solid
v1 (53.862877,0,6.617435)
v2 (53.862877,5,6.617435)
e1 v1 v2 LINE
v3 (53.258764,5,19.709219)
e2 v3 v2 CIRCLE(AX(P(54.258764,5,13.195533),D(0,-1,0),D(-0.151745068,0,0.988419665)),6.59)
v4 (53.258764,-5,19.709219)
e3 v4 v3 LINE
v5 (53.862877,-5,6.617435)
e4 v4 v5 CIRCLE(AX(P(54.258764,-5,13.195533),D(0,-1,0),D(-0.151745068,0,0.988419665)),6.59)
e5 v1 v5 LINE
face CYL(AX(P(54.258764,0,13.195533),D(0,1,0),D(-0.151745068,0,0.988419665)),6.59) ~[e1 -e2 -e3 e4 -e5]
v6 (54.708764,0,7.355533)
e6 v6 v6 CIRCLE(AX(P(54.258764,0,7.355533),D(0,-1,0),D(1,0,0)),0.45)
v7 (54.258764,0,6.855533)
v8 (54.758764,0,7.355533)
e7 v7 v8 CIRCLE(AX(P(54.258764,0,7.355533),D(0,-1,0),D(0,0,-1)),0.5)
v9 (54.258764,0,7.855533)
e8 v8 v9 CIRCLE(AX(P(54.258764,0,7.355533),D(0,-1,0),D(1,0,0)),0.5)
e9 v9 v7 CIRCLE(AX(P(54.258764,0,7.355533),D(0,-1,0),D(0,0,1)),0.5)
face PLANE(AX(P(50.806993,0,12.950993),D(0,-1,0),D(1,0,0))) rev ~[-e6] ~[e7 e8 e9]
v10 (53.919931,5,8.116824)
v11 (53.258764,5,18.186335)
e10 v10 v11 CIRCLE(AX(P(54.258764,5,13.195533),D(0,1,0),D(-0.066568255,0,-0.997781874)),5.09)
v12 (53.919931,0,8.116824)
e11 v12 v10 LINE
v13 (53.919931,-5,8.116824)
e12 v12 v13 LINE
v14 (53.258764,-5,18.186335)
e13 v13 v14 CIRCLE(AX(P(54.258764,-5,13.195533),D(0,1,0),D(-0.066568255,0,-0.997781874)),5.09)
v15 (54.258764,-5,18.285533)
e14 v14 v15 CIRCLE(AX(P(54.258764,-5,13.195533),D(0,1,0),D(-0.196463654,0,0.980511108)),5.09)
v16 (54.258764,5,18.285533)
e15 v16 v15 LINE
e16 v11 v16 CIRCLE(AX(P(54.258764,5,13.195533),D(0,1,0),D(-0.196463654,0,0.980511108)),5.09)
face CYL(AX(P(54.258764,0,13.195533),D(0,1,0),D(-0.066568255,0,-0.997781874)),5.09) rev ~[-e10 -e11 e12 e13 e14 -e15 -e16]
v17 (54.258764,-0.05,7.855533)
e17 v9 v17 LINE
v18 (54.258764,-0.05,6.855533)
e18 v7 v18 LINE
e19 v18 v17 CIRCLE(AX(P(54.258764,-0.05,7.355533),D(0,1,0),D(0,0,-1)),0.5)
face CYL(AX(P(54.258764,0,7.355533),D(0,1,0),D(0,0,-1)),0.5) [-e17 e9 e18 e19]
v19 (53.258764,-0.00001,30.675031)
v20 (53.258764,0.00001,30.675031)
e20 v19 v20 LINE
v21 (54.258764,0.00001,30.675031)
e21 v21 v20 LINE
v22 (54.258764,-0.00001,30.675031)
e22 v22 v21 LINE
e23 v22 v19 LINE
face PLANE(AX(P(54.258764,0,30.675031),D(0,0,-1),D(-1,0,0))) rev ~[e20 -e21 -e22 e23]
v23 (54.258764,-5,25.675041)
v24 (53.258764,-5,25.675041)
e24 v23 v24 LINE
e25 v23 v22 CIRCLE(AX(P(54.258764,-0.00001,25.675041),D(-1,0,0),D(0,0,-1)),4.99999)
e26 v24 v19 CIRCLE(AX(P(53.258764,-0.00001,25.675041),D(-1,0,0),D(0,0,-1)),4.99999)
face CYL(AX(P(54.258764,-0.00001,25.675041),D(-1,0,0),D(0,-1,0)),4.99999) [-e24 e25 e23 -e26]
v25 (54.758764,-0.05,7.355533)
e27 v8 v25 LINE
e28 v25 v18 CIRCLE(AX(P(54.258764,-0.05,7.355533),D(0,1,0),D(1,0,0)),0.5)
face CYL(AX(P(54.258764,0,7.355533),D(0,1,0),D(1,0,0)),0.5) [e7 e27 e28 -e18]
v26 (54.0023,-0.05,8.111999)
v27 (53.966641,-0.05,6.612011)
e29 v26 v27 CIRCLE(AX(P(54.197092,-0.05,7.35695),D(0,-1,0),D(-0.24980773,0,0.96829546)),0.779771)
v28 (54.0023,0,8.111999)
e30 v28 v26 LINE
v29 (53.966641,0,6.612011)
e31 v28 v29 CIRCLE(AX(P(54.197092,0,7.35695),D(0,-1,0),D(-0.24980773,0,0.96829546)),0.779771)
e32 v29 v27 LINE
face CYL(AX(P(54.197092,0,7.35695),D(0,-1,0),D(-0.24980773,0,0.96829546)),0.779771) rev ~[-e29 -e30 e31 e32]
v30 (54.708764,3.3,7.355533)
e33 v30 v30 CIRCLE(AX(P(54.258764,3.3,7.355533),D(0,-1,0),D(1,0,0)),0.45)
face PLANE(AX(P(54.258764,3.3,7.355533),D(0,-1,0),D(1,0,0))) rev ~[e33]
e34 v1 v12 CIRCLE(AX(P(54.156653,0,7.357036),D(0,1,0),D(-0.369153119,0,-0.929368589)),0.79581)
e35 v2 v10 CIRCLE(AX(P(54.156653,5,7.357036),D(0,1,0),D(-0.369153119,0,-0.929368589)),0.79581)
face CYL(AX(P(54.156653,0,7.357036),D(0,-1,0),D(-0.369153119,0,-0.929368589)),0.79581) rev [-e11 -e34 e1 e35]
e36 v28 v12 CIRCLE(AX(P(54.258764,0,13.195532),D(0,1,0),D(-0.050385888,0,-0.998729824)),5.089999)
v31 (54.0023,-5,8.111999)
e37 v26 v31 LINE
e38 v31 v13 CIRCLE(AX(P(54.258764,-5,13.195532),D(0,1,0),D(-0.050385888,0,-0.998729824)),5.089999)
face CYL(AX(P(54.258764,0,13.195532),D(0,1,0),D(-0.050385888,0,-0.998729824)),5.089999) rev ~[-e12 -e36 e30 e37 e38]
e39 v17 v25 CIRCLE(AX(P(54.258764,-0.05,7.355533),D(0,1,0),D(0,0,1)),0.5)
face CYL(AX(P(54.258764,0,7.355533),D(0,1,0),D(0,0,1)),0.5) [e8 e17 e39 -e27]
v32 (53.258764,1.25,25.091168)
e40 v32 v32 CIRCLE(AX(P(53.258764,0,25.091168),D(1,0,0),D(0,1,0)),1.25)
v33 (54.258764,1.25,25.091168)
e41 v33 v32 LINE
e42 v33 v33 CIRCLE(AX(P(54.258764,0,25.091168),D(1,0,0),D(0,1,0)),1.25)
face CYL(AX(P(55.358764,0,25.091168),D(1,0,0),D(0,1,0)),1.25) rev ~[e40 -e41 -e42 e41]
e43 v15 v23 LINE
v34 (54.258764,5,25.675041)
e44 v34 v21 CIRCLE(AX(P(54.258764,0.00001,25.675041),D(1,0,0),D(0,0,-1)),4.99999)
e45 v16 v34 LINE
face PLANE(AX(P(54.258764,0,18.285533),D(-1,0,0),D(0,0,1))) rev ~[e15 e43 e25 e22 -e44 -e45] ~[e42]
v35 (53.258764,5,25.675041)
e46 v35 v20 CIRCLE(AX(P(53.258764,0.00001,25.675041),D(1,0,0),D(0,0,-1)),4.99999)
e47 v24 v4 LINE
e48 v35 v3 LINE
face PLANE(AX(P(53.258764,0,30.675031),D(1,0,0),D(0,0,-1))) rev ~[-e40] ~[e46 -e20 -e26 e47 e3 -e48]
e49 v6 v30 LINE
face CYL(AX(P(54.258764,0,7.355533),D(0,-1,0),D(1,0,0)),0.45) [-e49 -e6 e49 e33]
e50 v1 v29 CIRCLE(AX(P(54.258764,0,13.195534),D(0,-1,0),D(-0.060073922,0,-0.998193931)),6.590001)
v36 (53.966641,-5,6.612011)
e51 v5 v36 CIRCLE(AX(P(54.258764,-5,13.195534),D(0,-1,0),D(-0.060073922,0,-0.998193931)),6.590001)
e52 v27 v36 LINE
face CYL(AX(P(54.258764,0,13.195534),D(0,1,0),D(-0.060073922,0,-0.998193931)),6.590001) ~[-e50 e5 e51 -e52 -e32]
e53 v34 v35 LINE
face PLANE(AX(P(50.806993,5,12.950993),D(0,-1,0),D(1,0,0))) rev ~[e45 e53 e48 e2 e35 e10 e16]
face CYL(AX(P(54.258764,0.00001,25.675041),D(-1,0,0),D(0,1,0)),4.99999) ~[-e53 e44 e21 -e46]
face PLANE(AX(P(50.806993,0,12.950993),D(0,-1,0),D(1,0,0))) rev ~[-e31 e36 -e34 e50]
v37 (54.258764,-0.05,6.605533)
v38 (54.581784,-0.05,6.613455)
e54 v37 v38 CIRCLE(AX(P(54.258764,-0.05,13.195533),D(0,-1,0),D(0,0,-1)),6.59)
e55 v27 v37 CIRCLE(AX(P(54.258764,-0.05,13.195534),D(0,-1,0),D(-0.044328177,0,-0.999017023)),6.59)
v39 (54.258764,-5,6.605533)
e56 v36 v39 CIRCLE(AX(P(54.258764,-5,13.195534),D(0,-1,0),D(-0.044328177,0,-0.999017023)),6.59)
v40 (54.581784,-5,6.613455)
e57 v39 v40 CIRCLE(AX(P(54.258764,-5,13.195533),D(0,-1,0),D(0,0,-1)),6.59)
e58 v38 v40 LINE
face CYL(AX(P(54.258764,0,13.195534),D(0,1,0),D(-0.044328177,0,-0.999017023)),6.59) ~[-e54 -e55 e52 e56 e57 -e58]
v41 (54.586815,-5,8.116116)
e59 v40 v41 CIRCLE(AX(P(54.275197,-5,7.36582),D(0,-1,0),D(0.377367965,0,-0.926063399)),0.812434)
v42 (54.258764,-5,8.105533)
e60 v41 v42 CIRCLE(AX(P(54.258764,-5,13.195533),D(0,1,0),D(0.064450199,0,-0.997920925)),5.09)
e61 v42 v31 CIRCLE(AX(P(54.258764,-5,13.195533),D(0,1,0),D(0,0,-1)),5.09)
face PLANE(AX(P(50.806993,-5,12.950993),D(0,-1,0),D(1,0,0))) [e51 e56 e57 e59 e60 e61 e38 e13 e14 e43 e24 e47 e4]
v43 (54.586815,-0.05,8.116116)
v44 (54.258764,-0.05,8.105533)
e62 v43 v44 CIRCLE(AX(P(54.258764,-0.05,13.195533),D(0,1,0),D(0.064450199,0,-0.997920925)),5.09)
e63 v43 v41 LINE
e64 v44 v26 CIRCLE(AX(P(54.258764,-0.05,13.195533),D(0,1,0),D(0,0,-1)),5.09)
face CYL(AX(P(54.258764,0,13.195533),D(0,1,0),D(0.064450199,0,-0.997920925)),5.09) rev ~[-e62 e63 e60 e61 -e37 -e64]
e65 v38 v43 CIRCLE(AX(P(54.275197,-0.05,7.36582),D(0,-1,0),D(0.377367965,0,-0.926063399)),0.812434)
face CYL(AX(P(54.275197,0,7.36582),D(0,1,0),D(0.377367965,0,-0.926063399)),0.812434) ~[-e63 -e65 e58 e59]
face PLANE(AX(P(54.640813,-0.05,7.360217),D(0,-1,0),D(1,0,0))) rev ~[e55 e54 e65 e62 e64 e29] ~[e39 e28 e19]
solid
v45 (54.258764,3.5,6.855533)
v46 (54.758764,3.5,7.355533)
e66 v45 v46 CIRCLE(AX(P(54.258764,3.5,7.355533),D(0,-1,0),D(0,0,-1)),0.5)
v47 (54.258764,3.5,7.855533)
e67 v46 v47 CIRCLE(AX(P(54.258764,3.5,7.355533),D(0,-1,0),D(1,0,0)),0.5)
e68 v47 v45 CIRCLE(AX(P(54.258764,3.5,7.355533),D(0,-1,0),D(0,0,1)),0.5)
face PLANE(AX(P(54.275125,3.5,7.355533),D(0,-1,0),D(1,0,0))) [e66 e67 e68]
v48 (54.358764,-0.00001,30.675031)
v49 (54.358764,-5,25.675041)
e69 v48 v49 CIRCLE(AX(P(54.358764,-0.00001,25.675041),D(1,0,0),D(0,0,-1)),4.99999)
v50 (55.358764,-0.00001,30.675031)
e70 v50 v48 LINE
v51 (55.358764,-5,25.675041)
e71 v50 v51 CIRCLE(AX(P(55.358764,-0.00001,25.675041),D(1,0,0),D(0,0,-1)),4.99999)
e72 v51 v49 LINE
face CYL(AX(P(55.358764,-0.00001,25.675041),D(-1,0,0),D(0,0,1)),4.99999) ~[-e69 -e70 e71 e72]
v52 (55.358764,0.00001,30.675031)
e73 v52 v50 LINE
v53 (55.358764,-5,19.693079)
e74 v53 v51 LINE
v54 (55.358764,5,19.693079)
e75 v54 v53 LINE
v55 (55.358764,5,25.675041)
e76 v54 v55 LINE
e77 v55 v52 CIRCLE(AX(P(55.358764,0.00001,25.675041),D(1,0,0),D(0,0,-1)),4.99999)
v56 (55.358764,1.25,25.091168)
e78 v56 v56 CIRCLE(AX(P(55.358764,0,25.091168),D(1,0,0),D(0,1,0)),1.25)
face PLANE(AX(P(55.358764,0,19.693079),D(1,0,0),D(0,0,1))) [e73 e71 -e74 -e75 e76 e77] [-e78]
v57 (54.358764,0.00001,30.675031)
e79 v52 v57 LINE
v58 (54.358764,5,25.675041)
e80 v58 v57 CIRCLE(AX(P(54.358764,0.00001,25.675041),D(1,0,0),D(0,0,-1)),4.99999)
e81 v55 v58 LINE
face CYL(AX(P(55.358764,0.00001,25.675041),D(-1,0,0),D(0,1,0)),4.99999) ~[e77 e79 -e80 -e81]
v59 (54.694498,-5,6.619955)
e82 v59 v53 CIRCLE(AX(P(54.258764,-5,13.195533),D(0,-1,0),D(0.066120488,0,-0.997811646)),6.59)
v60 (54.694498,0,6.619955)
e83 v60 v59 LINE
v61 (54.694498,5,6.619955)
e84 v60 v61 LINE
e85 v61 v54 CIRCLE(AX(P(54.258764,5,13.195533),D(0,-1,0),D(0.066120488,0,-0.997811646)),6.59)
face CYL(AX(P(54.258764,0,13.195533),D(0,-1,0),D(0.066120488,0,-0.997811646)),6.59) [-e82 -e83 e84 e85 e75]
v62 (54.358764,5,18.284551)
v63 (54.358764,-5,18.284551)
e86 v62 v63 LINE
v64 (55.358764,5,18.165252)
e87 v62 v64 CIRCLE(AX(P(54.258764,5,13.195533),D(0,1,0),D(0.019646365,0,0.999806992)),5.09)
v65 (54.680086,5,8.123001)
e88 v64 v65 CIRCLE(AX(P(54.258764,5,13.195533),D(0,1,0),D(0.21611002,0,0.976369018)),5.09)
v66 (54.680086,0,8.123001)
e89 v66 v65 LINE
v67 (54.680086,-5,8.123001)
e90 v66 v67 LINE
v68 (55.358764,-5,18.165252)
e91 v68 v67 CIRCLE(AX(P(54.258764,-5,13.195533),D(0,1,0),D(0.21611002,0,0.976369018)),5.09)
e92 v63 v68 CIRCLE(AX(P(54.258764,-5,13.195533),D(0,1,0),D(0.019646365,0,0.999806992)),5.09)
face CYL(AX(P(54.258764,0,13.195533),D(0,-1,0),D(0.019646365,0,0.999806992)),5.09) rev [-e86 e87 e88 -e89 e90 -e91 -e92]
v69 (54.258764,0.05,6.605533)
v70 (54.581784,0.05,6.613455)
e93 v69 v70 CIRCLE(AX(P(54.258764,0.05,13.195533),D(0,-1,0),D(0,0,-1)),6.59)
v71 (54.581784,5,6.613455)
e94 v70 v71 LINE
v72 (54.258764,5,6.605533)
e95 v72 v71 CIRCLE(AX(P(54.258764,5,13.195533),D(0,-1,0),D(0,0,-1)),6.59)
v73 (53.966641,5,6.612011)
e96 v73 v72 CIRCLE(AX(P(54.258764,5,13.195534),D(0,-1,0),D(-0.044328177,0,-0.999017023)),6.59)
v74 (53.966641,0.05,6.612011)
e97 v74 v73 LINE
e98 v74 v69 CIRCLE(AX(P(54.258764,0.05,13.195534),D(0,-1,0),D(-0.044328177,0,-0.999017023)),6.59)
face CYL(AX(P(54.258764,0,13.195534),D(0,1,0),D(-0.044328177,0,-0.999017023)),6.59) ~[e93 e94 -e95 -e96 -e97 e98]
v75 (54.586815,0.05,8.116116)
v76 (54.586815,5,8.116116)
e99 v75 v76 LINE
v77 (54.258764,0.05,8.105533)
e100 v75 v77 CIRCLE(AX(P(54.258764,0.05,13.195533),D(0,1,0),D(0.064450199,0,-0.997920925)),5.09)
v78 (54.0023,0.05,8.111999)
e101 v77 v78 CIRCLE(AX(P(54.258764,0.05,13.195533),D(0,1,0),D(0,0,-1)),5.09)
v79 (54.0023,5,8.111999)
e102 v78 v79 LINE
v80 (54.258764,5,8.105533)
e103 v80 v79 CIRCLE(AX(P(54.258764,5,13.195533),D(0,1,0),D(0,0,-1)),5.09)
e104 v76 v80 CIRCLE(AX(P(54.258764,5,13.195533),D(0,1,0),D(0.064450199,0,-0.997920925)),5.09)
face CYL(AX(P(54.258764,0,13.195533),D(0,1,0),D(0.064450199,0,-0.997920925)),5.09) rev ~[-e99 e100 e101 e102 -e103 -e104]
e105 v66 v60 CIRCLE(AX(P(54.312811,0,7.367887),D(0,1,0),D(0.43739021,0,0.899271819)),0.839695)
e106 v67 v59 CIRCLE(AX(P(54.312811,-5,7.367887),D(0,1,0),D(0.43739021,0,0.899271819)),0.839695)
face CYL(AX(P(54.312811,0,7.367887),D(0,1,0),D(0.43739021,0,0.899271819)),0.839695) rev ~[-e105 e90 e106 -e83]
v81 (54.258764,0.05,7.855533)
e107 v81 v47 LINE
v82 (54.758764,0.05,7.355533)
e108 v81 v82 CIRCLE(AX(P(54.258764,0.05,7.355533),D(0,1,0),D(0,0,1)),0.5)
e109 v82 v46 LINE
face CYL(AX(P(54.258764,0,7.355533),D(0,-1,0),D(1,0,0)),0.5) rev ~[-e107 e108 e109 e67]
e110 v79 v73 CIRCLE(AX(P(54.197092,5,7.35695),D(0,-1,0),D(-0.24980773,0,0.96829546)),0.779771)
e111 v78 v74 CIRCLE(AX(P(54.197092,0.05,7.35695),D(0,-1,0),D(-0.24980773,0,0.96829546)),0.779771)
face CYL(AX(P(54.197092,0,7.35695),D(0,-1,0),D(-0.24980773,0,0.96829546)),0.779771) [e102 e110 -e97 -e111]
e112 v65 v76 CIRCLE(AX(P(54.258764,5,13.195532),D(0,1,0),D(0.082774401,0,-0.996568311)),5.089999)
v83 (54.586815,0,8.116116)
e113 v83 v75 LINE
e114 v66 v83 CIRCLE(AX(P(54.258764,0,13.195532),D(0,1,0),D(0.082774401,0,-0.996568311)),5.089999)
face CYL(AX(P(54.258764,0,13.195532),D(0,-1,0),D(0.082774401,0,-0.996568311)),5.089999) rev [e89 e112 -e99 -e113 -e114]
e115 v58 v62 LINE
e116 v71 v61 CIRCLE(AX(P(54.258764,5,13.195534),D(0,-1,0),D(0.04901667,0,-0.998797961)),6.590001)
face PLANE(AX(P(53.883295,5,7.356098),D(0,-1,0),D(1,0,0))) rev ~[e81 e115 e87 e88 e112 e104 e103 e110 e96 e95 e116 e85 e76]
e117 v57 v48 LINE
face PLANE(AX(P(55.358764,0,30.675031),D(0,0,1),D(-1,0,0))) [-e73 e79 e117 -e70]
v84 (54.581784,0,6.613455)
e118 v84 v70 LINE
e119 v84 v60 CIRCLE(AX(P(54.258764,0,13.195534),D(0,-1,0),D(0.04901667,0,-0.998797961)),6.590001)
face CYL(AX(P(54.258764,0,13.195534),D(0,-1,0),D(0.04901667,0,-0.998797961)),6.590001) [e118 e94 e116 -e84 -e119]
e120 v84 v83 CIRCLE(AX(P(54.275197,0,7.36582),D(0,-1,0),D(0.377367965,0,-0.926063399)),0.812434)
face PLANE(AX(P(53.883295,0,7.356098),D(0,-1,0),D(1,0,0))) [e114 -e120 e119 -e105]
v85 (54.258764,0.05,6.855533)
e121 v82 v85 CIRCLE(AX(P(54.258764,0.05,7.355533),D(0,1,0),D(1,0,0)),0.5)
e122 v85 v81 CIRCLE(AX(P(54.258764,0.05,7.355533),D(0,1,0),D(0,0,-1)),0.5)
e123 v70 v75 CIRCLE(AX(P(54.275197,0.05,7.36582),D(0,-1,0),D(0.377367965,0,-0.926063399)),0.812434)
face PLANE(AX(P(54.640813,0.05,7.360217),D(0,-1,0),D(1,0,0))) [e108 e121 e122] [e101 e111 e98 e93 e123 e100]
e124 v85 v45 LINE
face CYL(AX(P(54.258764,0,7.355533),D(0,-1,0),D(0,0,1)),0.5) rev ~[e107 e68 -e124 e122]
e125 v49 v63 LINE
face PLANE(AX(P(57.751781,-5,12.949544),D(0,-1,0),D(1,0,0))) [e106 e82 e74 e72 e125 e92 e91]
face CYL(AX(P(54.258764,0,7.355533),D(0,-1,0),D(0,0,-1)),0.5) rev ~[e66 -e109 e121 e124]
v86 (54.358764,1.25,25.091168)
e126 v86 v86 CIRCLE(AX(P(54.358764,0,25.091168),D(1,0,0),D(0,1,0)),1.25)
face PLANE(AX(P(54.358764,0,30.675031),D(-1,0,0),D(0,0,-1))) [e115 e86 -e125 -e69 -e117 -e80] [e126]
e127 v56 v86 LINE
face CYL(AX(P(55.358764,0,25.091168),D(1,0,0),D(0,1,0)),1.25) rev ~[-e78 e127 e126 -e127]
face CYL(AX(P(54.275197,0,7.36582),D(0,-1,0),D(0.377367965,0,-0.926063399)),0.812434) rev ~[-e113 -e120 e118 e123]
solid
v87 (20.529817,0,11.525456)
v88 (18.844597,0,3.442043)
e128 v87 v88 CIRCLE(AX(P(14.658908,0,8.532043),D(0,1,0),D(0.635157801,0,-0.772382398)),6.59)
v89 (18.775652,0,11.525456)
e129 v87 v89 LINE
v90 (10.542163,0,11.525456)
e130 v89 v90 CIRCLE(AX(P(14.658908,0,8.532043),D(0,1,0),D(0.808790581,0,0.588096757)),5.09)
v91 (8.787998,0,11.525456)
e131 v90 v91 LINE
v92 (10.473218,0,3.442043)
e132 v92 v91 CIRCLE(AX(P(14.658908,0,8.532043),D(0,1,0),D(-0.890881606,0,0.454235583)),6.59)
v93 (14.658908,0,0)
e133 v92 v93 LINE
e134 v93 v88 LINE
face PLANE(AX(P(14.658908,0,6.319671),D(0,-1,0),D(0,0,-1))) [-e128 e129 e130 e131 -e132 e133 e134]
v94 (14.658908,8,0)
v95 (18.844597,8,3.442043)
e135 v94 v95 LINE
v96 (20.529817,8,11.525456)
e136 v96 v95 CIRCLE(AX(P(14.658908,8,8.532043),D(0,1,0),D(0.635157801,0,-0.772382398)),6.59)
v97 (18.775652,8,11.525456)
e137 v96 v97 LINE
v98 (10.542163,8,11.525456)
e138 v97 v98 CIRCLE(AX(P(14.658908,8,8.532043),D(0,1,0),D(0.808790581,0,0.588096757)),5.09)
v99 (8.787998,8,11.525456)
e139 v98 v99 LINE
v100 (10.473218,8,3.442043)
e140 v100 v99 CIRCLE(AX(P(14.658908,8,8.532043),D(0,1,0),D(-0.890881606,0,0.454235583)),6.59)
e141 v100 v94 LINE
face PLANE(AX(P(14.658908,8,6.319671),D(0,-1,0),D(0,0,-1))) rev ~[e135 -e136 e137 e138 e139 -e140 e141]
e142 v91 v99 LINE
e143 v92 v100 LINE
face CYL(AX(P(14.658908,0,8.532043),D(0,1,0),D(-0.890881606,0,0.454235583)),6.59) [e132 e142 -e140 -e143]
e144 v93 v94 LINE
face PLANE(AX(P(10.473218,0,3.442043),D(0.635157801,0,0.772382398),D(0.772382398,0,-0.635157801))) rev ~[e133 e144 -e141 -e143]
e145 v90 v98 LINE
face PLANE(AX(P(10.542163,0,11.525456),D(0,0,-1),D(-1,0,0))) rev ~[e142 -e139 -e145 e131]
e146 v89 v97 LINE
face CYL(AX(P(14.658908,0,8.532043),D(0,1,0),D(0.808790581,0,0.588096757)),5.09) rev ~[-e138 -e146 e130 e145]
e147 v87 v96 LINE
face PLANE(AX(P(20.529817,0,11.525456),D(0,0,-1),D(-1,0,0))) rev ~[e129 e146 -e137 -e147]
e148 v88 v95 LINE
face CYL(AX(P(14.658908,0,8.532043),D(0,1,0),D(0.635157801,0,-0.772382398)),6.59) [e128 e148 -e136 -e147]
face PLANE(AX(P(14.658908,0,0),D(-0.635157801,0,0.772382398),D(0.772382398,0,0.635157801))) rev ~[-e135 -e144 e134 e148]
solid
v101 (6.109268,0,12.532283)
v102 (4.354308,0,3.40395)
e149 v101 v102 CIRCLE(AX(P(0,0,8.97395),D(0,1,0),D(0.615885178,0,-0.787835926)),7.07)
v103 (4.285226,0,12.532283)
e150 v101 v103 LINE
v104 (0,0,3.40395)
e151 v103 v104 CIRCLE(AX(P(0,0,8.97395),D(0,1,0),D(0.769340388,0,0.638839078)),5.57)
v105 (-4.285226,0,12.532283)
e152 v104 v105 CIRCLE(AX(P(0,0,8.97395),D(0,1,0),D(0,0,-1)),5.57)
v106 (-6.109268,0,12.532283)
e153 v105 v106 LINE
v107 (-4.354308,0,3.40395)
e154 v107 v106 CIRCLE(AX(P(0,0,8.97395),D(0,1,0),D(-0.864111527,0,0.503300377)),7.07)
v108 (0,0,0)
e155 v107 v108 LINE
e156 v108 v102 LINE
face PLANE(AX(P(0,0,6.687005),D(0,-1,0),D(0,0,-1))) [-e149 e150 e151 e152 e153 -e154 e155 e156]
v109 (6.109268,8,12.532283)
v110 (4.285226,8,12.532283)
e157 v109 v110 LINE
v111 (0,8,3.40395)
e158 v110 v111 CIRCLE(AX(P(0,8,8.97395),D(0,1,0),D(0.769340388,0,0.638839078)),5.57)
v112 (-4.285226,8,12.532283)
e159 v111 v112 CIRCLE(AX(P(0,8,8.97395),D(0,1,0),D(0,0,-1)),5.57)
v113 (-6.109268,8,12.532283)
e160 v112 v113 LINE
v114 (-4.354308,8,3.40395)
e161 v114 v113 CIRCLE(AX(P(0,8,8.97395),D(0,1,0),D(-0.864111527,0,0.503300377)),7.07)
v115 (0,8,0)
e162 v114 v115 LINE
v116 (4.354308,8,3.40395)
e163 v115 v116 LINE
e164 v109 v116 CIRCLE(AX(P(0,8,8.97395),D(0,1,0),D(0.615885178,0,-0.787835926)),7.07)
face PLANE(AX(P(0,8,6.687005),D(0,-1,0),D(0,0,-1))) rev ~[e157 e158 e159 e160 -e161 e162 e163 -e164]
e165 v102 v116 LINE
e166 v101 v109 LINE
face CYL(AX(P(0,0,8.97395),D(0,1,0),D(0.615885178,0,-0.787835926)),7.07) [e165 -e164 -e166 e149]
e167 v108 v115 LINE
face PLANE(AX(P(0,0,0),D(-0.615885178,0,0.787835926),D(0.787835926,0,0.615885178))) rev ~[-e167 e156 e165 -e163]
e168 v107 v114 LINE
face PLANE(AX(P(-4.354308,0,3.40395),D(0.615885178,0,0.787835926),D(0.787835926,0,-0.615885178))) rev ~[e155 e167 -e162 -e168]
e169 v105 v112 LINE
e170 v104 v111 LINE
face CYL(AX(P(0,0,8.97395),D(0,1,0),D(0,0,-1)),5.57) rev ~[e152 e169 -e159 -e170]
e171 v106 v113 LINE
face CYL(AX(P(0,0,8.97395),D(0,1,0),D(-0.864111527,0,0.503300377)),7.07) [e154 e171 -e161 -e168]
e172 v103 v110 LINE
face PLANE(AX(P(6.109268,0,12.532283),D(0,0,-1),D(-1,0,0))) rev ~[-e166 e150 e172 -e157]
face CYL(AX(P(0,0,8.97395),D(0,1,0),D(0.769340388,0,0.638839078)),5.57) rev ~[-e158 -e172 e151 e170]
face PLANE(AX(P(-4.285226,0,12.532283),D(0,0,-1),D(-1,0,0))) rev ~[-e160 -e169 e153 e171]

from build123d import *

# Parameters (mm, degrees)
F5_DEPTH  = 5
F0_R      = 0.45
F6_DEPTH  = 3.5
F7_DEPTH  = 5
F8_DEPTH  = 3.3
F9_DEPTH  = 5.001
F10_DEPTH = 8.001
F11_DEPTH = 0.05
F12_R     = 1.25
F13_DEPTH = 62.4297639076
F14_R     = 4.99999


# Not quite as in the source:
# - a fillet or chamfer is up to 0.001 mm smaller than in the source, because OpenCascade refuses the exact size
# - a feature names something its author has since deleted; it is built from what else it names


with BuildPart() as f3:
    # F3: sweep along a path in F2
    with BuildLine(Plane.XY) as f3_path:
        Line((0, 0), (0, 8))
    # F0 (on Front) → F3 (sweep)
    with BuildSketch(Plane.XZ):
        with BuildLine():
            Line((-4.2852259595, 12.5322833964), (-6.1092684933, 12.5322833964))
            ThreePointArc((-6.1092684933, 12.5322833964), (-6.9428544736, 7.6391569536), (-4.3543082114, 3.4039497307))
            Line((-4.3543082114, 3.4039497307), (0, 3.4039497307))
            ThreePointArc((0, 3.4039497307), (-5.042063988, 6.6069916109), (-4.2852259595, 12.5322833964))
        make_face()
        with BuildLine():
            Line((0, 3.4039497307), (-4.3543082114, 3.4039497307))
            ThreePointArc((-4.3543082114, 3.4039497307), (-2.3027157879, 2.2894602214), (0, 1.9039497307))
            Line((0, 1.9039497307), (0, 3.4039497307))
        make_face()
        with BuildLine():
            ThreePointArc((0, 1.9039497307), (-2.3027157879, 2.2894602214), (-4.3543082114, 3.4039497307))
            Line((-4.3543082114, 3.4039497307), (0, 0))
            Line((0, 0), (0, 1.9039497307))
        make_face()
        with BuildLine():
            ThreePointArc((4.3543082114, 3.4039497307), (2.3027157879, 2.2894602214), (0, 1.9039497307))
            Line((0, 1.9039497307), (0, 0))
            Line((0, 0), (4.3543082114, 3.4039497307))
        make_face()
        with BuildLine():
            Line((0, 3.4039497307), (0, 1.9039497307))
            ThreePointArc((0, 1.9039497307), (2.3027157879, 2.2894602214), (4.3543082114, 3.4039497307))
            Line((4.3543082114, 3.4039497307), (0, 3.4039497307))
        make_face()
        with BuildLine():
            ThreePointArc((4.2852259595, 12.5322833964), (5.042063988, 6.6069916109), (0, 3.4039497307))
            Line((0, 3.4039497307), (4.3543082114, 3.4039497307))
            ThreePointArc((4.3543082114, 3.4039497307), (6.9428544736, 7.6391569536), (6.1092684933, 12.5322833964))
            Line((6.1092684933, 12.5322833964), (4.2852259595, 12.5322833964))
        make_face()
    sweep(path=f3_path.line)

    # F0 (on Front) → F9 (cut, through all)
    with BuildSketch(Plane.XZ):
        with BuildLine():
            ThreePointArc((54.5868154242, 8.1161158316), (55.0876267464, 7.3630999101), (54.581783754, 6.6134547771))
            ThreePointArc((54.581783754, 6.6134547771), (54.6381547588, 6.6164632985), (54.6944979239, 6.6199545901))
            ThreePointArc((54.6944979239, 6.6199545901), (55.1524674782, 7.3759380646), (54.6800855939, 8.1230006335))
            ThreePointArc((54.6800855939, 8.1230006335), (54.6334663221, 8.1193440091), (54.5868154242, 8.1161158316))
        make_face()
    extrude(amount=F9_DEPTH, mode=Mode.SUBTRACT)

    # F0 (on Front) → F10 (cut, through all)
    with BuildSketch(Plane.XZ):
        with BuildLine():
            ThreePointArc((53.9199314878, 8.116823601), (53.3614179699, 7.3872965022), (53.862876759, 6.6174353327))
            ThreePointArc((53.862876759, 6.6174353327), (53.9147482987, 6.6145187306), (53.9666412198, 6.6120111547))
            ThreePointArc((53.9666412198, 6.6120111547), (53.4175421646, 7.3754821716), (54.0022997363, 8.1119985313))
            ThreePointArc((54.0022997363, 8.1119985313), (53.961105835, 8.1142441636), (53.9199314878, 8.116823601))
        make_face()
    extrude(amount=-F10_DEPTH, mode=Mode.SUBTRACT)


with BuildPart() as f4:
    # F4: sweep along a path in F2
    with BuildLine(Plane.XY) as f4_path:
        Line((14.6589075401, 0), (14.6589075401, 8))
    # F0 (on Front) → F4 (sweep)
    with BuildSketch(Plane.XZ):
        with BuildLine():
            Line((10.542163481, 11.5254557146), (8.7879977598, 11.5254557146))
            ThreePointArc((8.7879977598, 11.5254557146), (8.2076139721, 7.1870854906), (10.4732176329, 3.442043222))
            Line((10.4732176329, 3.442043222), (14.6589075401, 3.442043222))
            ThreePointArc((14.6589075401, 3.442043222), (10.1232394754, 6.2221048665), (10.542163481, 11.5254557146))
        make_face()
        with BuildLine():
            Line((14.6589075401, 3.442043222), (10.4732176329, 3.442043222))
            ThreePointArc((10.4732176329, 3.442043222), (12.4357341326, 2.3283668926), (14.6589075401, 1.942043222))
            Line((14.6589075401, 1.942043222), (14.6589075401, 3.442043222))
        make_face()
        with BuildLine():
            ThreePointArc((14.6589075401, 1.942043222), (12.4357341326, 2.3283668926), (10.4732176329, 3.442043222))
            Line((10.4732176329, 3.442043222), (14.6589075401, 0))
            Line((14.6589075401, 0), (14.6589075401, 1.942043222))
        make_face()
        with BuildLine():
            ThreePointArc((18.8445974474, 3.442043222), (16.8820809477, 2.3283668926), (14.6589075401, 1.942043222))
            Line((14.6589075401, 1.942043222), (14.6589075401, 0))
            Line((14.6589075401, 0), (18.8445974474, 3.442043222))
        make_face()
        with BuildLine():
            Line((14.6589075401, 3.442043222), (14.6589075401, 1.942043222))
            ThreePointArc((14.6589075401, 1.942043222), (16.8820809477, 2.3283668926), (18.8445974474, 3.442043222))
            Line((18.8445974474, 3.442043222), (14.6589075401, 3.442043222))
        make_face()
        with BuildLine():
            ThreePointArc((18.7756515993, 11.5254557146), (19.1945756049, 6.2221048665), (14.6589075401, 3.442043222))
            Line((14.6589075401, 3.442043222), (18.8445974474, 3.442043222))
            ThreePointArc((18.8445974474, 3.442043222), (21.1102011082, 7.1870854906), (20.5298173205, 11.5254557146))
            Line((20.5298173205, 11.5254557146), (18.7756515993, 11.5254557146))
        make_face()
    sweep(path=f4_path.line)


with BuildPart() as f5:
    # F0 (on Front) → F5 (new body)
    with BuildSketch(Plane.XZ):
        with BuildLine():
            Line((53.2587639076, 18.1863348766), (53.2587639076, 19.7092189305))
            ThreePointArc((53.2587639076, 19.7092189305), (47.6757687932, 12.8917648009), (53.862876759, 6.6174353327))
            ThreePointArc((53.862876759, 6.6174353327), (53.3614179699, 7.3872965022), (53.9199314878, 8.116823601))
            ThreePointArc((53.9199314878, 8.116823601), (49.1797007662, 12.8620403018), (53.2587639076, 18.1863348766))
        make_face()
        with BuildLine():
            Line((53.2587639076, 30.67503149), (53.2587639076, 19.7092189305))
            Line((53.2587639076, 19.7092189305), (53.2587639076, 18.1863348766))
            ThreePointArc((53.2587639076, 18.1863348766), (53.7563098464, 18.2606730117), (54.2587639076, 18.2855333378))
            Line((54.2587639076, 18.2855333378), (54.2587639076, 30.67503149))
            Line((54.2587639076, 30.67503149), (53.2587639076, 30.67503149))
        make_face()
    extrude(amount=-F5_DEPTH)



with BuildPart() as f5b:
    # F0 (on Front) → F5, piece 2 (new body)
    with BuildSketch(Plane.XZ):
        with BuildLine():
            ThreePointArc((54.0022997363, 8.1119985313), (53.4175421646, 7.3754821716), (53.9666412198, 6.6120111547))
            ThreePointArc((53.9666412198, 6.6120111547), (54.1126666567, 6.6071529911), (54.2587639076, 6.6055333378))
            Line((54.2587639076, 6.6055333378), (54.2587639076, 6.8555333378))
            ThreePointArc((54.2587639076, 6.8555333378), (53.7587639076, 7.3555333378), (54.2587639076, 7.8555333378))
            Line((54.2587639076, 7.8555333378), (54.2587639076, 8.1055333378))
            ThreePointArc((54.2587639076, 8.1055333378), (54.1304910833, 8.1071498929), (54.0022997363, 8.1119985313))
        make_face()
        with BuildLine():
            Line((54.2587639076, 6.8555333378), (54.2587639076, 6.6055333378))
            ThreePointArc((54.2587639076, 6.6055333378), (54.420322388, 6.6075139953), (54.581783754, 6.6134547771))
            ThreePointArc((54.581783754, 6.6134547771), (55.0876267464, 7.3630999101), (54.5868154242, 8.1161158316))
            ThreePointArc((54.5868154242, 8.1161158316), (54.4228749879, 8.1081796492), (54.2587639076, 8.1055333378))
            Line((54.2587639076, 8.1055333378), (54.2587639076, 7.8555333378))
            ThreePointArc((54.2587639076, 7.8555333378), (54.6123172982, 7.7090867284), (54.7587639076, 7.3555333378))
            ThreePointArc((54.7587639076, 7.3555333378), (54.6123172982, 7.0019799472), (54.2587639076, 6.8555333378))
        make_face()
        with BuildLine():
            ThreePointArc((54.5868154242, 8.1161158316), (55.0876267464, 7.3630999101), (54.581783754, 6.6134547771))
            ThreePointArc((54.581783754, 6.6134547771), (54.6381547588, 6.6164632985), (54.6944979239, 6.6199545901))
            ThreePointArc((54.6944979239, 6.6199545901), (55.1524674782, 7.3759380646), (54.6800855939, 8.1230006335))
            ThreePointArc((54.6800855939, 8.1230006335), (54.6334663221, 8.1193440091), (54.5868154242, 8.1161158316))
        make_face()
        with BuildLine():
            ThreePointArc((54.2587639076, 7.8555333378), (53.7587639076, 7.3555333378), (54.2587639076, 6.8555333378))
            ThreePointArc((54.2587639076, 6.8555333378), (54.6123172982, 7.0019799472), (54.7587639076, 7.3555333378))
            ThreePointArc((54.7587639076, 7.3555333378), (54.6123172982, 7.7090867284), (54.2587639076, 7.8555333378))
        make_face()
        with Locations((54.2587639076, 7.3555333378)):
            Circle(F0_R, mode=Mode.SUBTRACT)
        with BuildLine():
            ThreePointArc((54.6800855939, 8.1230006335), (55.1524674782, 7.3759380646), (54.6944979239, 6.6199545901))
            ThreePointArc((54.6944979239, 6.6199545901), (60.8402732623, 12.8611165114), (55.3587639076, 19.6930790283))
            Line((55.3587639076, 19.6930790283), (55.3587639076, 18.1652516397))
            ThreePointArc((55.3587639076, 18.1652516397), (59.3371796287, 12.8523223769), (54.6800855939, 8.1230006335))
        make_face()
        with BuildLine():
            Line((55.3587639076, 18.1652516397), (55.3587639076, 19.6930790283))
            Line((55.3587639076, 19.6930790283), (55.3587639076, 30.67503149))
            Line((55.3587639076, 30.67503149), (54.3587639076, 30.67503149))
            Line((54.3587639076, 30.67503149), (54.3587639076, 18.2845509247))
            ThreePointArc((54.3587639076, 18.2845509247), (54.8617216838, 18.24969419), (55.3587639076, 18.1652516397))
        make_face()
        with Locations((54.2587639076, 7.3555333378)):
            Circle(F0_R)
    extrude(amount=-F5_DEPTH)

    # F0 (on Front) → F6 (cut)
    with BuildSketch(Plane.XZ):
        with BuildLine():
            ThreePointArc((54.2587639076, 7.8555333378), (53.7587639076, 7.3555333378), (54.2587639076, 6.8555333378))
            ThreePointArc((54.2587639076, 6.8555333378), (54.6123172982, 7.0019799472), (54.7587639076, 7.3555333378))
            ThreePointArc((54.7587639076, 7.3555333378), (54.6123172982, 7.7090867284), (54.2587639076, 7.8555333378))
        make_face()
        with Locations((54.2587639076, 7.3555333378)):
            Circle(F0_R, mode=Mode.SUBTRACT)
        with Locations((54.2587639076, 7.3555333378)):
            Circle(F0_R)
    extrude(amount=-F6_DEPTH, mode=Mode.SUBTRACT)


with BuildPart() as f5_1:
    add(f5.part)

    add(f5b.part)  # F7 merges F5b
    # F0 (on Front) → F7 (join)
    with BuildSketch(Plane.XZ):
        with BuildLine():
            Line((53.2587639076, 18.1863348766), (53.2587639076, 19.7092189305))
            ThreePointArc((53.2587639076, 19.7092189305), (47.6757687932, 12.8917648009), (53.862876759, 6.6174353327))
            ThreePointArc((53.862876759, 6.6174353327), (53.3614179699, 7.3872965022), (53.9199314878, 8.116823601))
            ThreePointArc((53.9199314878, 8.116823601), (49.1797007662, 12.8620403018), (53.2587639076, 18.1863348766))
        make_face()
        with BuildLine():
            Line((53.2587639076, 30.67503149), (53.2587639076, 19.7092189305))
            Line((53.2587639076, 19.7092189305), (53.2587639076, 18.1863348766))
            ThreePointArc((53.2587639076, 18.1863348766), (53.7563098464, 18.2606730117), (54.2587639076, 18.2855333378))
            Line((54.2587639076, 18.2855333378), (54.2587639076, 30.67503149))
            Line((54.2587639076, 30.67503149), (53.2587639076, 30.67503149))
        make_face()
        with BuildLine():
            ThreePointArc((53.9199314878, 8.116823601), (53.3614179699, 7.3872965022), (53.862876759, 6.6174353327))
            ThreePointArc((53.862876759, 6.6174353327), (53.9147482987, 6.6145187306), (53.9666412198, 6.6120111547))
            ThreePointArc((53.9666412198, 6.6120111547), (53.4175421646, 7.3754821716), (54.0022997363, 8.1119985313))
            ThreePointArc((54.0022997363, 8.1119985313), (53.961105835, 8.1142441636), (53.9199314878, 8.116823601))
        make_face()
        with BuildLine():
            ThreePointArc((54.0022997363, 8.1119985313), (53.4175421646, 7.3754821716), (53.9666412198, 6.6120111547))
            ThreePointArc((53.9666412198, 6.6120111547), (54.1126666567, 6.6071529911), (54.2587639076, 6.6055333378))
            Line((54.2587639076, 6.6055333378), (54.2587639076, 6.8555333378))
            ThreePointArc((54.2587639076, 6.8555333378), (53.7587639076, 7.3555333378), (54.2587639076, 7.8555333378))
            Line((54.2587639076, 7.8555333378), (54.2587639076, 8.1055333378))
            ThreePointArc((54.2587639076, 8.1055333378), (54.1304910833, 8.1071498929), (54.0022997363, 8.1119985313))
        make_face()
        with BuildLine():
            Line((54.2587639076, 6.8555333378), (54.2587639076, 6.6055333378))
            ThreePointArc((54.2587639076, 6.6055333378), (54.420322388, 6.6075139953), (54.581783754, 6.6134547771))
            ThreePointArc((54.581783754, 6.6134547771), (55.0876267464, 7.3630999101), (54.5868154242, 8.1161158316))
            ThreePointArc((54.5868154242, 8.1161158316), (54.4228749879, 8.1081796492), (54.2587639076, 8.1055333378))
            Line((54.2587639076, 8.1055333378), (54.2587639076, 7.8555333378))
            ThreePointArc((54.2587639076, 7.8555333378), (54.6123172982, 7.7090867284), (54.7587639076, 7.3555333378))
            ThreePointArc((54.7587639076, 7.3555333378), (54.6123172982, 7.0019799472), (54.2587639076, 6.8555333378))
        make_face()
        with BuildLine():
            ThreePointArc((54.2587639076, 7.8555333378), (53.7587639076, 7.3555333378), (54.2587639076, 6.8555333378))
            ThreePointArc((54.2587639076, 6.8555333378), (54.6123172982, 7.0019799472), (54.7587639076, 7.3555333378))
            ThreePointArc((54.7587639076, 7.3555333378), (54.6123172982, 7.7090867284), (54.2587639076, 7.8555333378))
        make_face()
        with Locations((54.2587639076, 7.3555333378)):
            Circle(F0_R, mode=Mode.SUBTRACT)
        with BuildLine():
            ThreePointArc((54.6800855939, 8.1230006335), (55.1524674782, 7.3759380646), (54.6944979239, 6.6199545901))
            ThreePointArc((54.6944979239, 6.6199545901), (60.8402732623, 12.8611165114), (55.3587639076, 19.6930790283))
            Line((55.3587639076, 19.6930790283), (55.3587639076, 18.1652516397))
            ThreePointArc((55.3587639076, 18.1652516397), (59.3371796287, 12.8523223769), (54.6800855939, 8.1230006335))
        make_face()
        with BuildLine():
            Line((55.3587639076, 18.1652516397), (55.3587639076, 19.6930790283))
            Line((55.3587639076, 19.6930790283), (55.3587639076, 30.67503149))
            Line((55.3587639076, 30.67503149), (54.3587639076, 30.67503149))
            Line((54.3587639076, 30.67503149), (54.3587639076, 18.2845509247))
            ThreePointArc((54.3587639076, 18.2845509247), (54.8617216838, 18.24969419), (55.3587639076, 18.1652516397))
        make_face()
        with Locations((54.2587639076, 7.3555333378)):
            Circle(F0_R)
    extrude(amount=F7_DEPTH)

    # F0 (on Front) → F8 (join)
    with BuildSketch(Plane.XZ):
        with Locations((54.2587639076, 7.3555333378)):
            Circle(F0_R)
    extrude(amount=-F8_DEPTH)

    # F0 (on Front) → F11 (cut, symmetric)
    with BuildSketch(Plane.XZ):
        with BuildLine():
            Line((54.2587639076, 6.8555333378), (54.2587639076, 6.6055333378))
            ThreePointArc((54.2587639076, 6.6055333378), (54.420322388, 6.6075139953), (54.581783754, 6.6134547771))
            ThreePointArc((54.581783754, 6.6134547771), (55.0876267464, 7.3630999101), (54.5868154242, 8.1161158316))
            ThreePointArc((54.5868154242, 8.1161158316), (54.4228749879, 8.1081796492), (54.2587639076, 8.1055333378))
            Line((54.2587639076, 8.1055333378), (54.2587639076, 7.8555333378))
            ThreePointArc((54.2587639076, 7.8555333378), (54.6123172982, 7.7090867284), (54.7587639076, 7.3555333378))
            ThreePointArc((54.7587639076, 7.3555333378), (54.6123172982, 7.0019799472), (54.2587639076, 6.8555333378))
        make_face()
        with BuildLine():
            ThreePointArc((54.0022997363, 8.1119985313), (53.4175421646, 7.3754821716), (53.9666412198, 6.6120111547))
            ThreePointArc((53.9666412198, 6.6120111547), (54.1126666567, 6.6071529911), (54.2587639076, 6.6055333378))
            Line((54.2587639076, 6.6055333378), (54.2587639076, 6.8555333378))
            ThreePointArc((54.2587639076, 6.8555333378), (53.7587639076, 7.3555333378), (54.2587639076, 7.8555333378))
            Line((54.2587639076, 7.8555333378), (54.2587639076, 8.1055333378))
            ThreePointArc((54.2587639076, 8.1055333378), (54.1304910833, 8.1071498929), (54.0022997363, 8.1119985313))
        make_face()
    extrude(amount=F11_DEPTH, both=True, mode=Mode.SUBTRACT)

    # F12 (on face) → F13 (cut, through all)
    with BuildSketch(Plane.YZ.offset(55.3587639076)):
        with Locations((0, 25.0911675394)):
            Circle(F12_R)
    extrude(amount=-F13_DEPTH, mode=Mode.SUBTRACT)

    # F14 (radius 5 in the source; OpenCascade refuses exactly that, so slightly less here)
    f14_edges = [f5_1.edges().sort_by_distance(p)[0] for p in [
        (53.758764, -5, 30.675031),
        (54.858764, -5, 30.675031),
        (53.758764, 5, 30.675031),
        (54.858764, 5, 30.675031),
    ]]
    fillet(f14_edges, radius=F14_R)


solid = Compound([f3.part, f4.part, f5_1.part])
